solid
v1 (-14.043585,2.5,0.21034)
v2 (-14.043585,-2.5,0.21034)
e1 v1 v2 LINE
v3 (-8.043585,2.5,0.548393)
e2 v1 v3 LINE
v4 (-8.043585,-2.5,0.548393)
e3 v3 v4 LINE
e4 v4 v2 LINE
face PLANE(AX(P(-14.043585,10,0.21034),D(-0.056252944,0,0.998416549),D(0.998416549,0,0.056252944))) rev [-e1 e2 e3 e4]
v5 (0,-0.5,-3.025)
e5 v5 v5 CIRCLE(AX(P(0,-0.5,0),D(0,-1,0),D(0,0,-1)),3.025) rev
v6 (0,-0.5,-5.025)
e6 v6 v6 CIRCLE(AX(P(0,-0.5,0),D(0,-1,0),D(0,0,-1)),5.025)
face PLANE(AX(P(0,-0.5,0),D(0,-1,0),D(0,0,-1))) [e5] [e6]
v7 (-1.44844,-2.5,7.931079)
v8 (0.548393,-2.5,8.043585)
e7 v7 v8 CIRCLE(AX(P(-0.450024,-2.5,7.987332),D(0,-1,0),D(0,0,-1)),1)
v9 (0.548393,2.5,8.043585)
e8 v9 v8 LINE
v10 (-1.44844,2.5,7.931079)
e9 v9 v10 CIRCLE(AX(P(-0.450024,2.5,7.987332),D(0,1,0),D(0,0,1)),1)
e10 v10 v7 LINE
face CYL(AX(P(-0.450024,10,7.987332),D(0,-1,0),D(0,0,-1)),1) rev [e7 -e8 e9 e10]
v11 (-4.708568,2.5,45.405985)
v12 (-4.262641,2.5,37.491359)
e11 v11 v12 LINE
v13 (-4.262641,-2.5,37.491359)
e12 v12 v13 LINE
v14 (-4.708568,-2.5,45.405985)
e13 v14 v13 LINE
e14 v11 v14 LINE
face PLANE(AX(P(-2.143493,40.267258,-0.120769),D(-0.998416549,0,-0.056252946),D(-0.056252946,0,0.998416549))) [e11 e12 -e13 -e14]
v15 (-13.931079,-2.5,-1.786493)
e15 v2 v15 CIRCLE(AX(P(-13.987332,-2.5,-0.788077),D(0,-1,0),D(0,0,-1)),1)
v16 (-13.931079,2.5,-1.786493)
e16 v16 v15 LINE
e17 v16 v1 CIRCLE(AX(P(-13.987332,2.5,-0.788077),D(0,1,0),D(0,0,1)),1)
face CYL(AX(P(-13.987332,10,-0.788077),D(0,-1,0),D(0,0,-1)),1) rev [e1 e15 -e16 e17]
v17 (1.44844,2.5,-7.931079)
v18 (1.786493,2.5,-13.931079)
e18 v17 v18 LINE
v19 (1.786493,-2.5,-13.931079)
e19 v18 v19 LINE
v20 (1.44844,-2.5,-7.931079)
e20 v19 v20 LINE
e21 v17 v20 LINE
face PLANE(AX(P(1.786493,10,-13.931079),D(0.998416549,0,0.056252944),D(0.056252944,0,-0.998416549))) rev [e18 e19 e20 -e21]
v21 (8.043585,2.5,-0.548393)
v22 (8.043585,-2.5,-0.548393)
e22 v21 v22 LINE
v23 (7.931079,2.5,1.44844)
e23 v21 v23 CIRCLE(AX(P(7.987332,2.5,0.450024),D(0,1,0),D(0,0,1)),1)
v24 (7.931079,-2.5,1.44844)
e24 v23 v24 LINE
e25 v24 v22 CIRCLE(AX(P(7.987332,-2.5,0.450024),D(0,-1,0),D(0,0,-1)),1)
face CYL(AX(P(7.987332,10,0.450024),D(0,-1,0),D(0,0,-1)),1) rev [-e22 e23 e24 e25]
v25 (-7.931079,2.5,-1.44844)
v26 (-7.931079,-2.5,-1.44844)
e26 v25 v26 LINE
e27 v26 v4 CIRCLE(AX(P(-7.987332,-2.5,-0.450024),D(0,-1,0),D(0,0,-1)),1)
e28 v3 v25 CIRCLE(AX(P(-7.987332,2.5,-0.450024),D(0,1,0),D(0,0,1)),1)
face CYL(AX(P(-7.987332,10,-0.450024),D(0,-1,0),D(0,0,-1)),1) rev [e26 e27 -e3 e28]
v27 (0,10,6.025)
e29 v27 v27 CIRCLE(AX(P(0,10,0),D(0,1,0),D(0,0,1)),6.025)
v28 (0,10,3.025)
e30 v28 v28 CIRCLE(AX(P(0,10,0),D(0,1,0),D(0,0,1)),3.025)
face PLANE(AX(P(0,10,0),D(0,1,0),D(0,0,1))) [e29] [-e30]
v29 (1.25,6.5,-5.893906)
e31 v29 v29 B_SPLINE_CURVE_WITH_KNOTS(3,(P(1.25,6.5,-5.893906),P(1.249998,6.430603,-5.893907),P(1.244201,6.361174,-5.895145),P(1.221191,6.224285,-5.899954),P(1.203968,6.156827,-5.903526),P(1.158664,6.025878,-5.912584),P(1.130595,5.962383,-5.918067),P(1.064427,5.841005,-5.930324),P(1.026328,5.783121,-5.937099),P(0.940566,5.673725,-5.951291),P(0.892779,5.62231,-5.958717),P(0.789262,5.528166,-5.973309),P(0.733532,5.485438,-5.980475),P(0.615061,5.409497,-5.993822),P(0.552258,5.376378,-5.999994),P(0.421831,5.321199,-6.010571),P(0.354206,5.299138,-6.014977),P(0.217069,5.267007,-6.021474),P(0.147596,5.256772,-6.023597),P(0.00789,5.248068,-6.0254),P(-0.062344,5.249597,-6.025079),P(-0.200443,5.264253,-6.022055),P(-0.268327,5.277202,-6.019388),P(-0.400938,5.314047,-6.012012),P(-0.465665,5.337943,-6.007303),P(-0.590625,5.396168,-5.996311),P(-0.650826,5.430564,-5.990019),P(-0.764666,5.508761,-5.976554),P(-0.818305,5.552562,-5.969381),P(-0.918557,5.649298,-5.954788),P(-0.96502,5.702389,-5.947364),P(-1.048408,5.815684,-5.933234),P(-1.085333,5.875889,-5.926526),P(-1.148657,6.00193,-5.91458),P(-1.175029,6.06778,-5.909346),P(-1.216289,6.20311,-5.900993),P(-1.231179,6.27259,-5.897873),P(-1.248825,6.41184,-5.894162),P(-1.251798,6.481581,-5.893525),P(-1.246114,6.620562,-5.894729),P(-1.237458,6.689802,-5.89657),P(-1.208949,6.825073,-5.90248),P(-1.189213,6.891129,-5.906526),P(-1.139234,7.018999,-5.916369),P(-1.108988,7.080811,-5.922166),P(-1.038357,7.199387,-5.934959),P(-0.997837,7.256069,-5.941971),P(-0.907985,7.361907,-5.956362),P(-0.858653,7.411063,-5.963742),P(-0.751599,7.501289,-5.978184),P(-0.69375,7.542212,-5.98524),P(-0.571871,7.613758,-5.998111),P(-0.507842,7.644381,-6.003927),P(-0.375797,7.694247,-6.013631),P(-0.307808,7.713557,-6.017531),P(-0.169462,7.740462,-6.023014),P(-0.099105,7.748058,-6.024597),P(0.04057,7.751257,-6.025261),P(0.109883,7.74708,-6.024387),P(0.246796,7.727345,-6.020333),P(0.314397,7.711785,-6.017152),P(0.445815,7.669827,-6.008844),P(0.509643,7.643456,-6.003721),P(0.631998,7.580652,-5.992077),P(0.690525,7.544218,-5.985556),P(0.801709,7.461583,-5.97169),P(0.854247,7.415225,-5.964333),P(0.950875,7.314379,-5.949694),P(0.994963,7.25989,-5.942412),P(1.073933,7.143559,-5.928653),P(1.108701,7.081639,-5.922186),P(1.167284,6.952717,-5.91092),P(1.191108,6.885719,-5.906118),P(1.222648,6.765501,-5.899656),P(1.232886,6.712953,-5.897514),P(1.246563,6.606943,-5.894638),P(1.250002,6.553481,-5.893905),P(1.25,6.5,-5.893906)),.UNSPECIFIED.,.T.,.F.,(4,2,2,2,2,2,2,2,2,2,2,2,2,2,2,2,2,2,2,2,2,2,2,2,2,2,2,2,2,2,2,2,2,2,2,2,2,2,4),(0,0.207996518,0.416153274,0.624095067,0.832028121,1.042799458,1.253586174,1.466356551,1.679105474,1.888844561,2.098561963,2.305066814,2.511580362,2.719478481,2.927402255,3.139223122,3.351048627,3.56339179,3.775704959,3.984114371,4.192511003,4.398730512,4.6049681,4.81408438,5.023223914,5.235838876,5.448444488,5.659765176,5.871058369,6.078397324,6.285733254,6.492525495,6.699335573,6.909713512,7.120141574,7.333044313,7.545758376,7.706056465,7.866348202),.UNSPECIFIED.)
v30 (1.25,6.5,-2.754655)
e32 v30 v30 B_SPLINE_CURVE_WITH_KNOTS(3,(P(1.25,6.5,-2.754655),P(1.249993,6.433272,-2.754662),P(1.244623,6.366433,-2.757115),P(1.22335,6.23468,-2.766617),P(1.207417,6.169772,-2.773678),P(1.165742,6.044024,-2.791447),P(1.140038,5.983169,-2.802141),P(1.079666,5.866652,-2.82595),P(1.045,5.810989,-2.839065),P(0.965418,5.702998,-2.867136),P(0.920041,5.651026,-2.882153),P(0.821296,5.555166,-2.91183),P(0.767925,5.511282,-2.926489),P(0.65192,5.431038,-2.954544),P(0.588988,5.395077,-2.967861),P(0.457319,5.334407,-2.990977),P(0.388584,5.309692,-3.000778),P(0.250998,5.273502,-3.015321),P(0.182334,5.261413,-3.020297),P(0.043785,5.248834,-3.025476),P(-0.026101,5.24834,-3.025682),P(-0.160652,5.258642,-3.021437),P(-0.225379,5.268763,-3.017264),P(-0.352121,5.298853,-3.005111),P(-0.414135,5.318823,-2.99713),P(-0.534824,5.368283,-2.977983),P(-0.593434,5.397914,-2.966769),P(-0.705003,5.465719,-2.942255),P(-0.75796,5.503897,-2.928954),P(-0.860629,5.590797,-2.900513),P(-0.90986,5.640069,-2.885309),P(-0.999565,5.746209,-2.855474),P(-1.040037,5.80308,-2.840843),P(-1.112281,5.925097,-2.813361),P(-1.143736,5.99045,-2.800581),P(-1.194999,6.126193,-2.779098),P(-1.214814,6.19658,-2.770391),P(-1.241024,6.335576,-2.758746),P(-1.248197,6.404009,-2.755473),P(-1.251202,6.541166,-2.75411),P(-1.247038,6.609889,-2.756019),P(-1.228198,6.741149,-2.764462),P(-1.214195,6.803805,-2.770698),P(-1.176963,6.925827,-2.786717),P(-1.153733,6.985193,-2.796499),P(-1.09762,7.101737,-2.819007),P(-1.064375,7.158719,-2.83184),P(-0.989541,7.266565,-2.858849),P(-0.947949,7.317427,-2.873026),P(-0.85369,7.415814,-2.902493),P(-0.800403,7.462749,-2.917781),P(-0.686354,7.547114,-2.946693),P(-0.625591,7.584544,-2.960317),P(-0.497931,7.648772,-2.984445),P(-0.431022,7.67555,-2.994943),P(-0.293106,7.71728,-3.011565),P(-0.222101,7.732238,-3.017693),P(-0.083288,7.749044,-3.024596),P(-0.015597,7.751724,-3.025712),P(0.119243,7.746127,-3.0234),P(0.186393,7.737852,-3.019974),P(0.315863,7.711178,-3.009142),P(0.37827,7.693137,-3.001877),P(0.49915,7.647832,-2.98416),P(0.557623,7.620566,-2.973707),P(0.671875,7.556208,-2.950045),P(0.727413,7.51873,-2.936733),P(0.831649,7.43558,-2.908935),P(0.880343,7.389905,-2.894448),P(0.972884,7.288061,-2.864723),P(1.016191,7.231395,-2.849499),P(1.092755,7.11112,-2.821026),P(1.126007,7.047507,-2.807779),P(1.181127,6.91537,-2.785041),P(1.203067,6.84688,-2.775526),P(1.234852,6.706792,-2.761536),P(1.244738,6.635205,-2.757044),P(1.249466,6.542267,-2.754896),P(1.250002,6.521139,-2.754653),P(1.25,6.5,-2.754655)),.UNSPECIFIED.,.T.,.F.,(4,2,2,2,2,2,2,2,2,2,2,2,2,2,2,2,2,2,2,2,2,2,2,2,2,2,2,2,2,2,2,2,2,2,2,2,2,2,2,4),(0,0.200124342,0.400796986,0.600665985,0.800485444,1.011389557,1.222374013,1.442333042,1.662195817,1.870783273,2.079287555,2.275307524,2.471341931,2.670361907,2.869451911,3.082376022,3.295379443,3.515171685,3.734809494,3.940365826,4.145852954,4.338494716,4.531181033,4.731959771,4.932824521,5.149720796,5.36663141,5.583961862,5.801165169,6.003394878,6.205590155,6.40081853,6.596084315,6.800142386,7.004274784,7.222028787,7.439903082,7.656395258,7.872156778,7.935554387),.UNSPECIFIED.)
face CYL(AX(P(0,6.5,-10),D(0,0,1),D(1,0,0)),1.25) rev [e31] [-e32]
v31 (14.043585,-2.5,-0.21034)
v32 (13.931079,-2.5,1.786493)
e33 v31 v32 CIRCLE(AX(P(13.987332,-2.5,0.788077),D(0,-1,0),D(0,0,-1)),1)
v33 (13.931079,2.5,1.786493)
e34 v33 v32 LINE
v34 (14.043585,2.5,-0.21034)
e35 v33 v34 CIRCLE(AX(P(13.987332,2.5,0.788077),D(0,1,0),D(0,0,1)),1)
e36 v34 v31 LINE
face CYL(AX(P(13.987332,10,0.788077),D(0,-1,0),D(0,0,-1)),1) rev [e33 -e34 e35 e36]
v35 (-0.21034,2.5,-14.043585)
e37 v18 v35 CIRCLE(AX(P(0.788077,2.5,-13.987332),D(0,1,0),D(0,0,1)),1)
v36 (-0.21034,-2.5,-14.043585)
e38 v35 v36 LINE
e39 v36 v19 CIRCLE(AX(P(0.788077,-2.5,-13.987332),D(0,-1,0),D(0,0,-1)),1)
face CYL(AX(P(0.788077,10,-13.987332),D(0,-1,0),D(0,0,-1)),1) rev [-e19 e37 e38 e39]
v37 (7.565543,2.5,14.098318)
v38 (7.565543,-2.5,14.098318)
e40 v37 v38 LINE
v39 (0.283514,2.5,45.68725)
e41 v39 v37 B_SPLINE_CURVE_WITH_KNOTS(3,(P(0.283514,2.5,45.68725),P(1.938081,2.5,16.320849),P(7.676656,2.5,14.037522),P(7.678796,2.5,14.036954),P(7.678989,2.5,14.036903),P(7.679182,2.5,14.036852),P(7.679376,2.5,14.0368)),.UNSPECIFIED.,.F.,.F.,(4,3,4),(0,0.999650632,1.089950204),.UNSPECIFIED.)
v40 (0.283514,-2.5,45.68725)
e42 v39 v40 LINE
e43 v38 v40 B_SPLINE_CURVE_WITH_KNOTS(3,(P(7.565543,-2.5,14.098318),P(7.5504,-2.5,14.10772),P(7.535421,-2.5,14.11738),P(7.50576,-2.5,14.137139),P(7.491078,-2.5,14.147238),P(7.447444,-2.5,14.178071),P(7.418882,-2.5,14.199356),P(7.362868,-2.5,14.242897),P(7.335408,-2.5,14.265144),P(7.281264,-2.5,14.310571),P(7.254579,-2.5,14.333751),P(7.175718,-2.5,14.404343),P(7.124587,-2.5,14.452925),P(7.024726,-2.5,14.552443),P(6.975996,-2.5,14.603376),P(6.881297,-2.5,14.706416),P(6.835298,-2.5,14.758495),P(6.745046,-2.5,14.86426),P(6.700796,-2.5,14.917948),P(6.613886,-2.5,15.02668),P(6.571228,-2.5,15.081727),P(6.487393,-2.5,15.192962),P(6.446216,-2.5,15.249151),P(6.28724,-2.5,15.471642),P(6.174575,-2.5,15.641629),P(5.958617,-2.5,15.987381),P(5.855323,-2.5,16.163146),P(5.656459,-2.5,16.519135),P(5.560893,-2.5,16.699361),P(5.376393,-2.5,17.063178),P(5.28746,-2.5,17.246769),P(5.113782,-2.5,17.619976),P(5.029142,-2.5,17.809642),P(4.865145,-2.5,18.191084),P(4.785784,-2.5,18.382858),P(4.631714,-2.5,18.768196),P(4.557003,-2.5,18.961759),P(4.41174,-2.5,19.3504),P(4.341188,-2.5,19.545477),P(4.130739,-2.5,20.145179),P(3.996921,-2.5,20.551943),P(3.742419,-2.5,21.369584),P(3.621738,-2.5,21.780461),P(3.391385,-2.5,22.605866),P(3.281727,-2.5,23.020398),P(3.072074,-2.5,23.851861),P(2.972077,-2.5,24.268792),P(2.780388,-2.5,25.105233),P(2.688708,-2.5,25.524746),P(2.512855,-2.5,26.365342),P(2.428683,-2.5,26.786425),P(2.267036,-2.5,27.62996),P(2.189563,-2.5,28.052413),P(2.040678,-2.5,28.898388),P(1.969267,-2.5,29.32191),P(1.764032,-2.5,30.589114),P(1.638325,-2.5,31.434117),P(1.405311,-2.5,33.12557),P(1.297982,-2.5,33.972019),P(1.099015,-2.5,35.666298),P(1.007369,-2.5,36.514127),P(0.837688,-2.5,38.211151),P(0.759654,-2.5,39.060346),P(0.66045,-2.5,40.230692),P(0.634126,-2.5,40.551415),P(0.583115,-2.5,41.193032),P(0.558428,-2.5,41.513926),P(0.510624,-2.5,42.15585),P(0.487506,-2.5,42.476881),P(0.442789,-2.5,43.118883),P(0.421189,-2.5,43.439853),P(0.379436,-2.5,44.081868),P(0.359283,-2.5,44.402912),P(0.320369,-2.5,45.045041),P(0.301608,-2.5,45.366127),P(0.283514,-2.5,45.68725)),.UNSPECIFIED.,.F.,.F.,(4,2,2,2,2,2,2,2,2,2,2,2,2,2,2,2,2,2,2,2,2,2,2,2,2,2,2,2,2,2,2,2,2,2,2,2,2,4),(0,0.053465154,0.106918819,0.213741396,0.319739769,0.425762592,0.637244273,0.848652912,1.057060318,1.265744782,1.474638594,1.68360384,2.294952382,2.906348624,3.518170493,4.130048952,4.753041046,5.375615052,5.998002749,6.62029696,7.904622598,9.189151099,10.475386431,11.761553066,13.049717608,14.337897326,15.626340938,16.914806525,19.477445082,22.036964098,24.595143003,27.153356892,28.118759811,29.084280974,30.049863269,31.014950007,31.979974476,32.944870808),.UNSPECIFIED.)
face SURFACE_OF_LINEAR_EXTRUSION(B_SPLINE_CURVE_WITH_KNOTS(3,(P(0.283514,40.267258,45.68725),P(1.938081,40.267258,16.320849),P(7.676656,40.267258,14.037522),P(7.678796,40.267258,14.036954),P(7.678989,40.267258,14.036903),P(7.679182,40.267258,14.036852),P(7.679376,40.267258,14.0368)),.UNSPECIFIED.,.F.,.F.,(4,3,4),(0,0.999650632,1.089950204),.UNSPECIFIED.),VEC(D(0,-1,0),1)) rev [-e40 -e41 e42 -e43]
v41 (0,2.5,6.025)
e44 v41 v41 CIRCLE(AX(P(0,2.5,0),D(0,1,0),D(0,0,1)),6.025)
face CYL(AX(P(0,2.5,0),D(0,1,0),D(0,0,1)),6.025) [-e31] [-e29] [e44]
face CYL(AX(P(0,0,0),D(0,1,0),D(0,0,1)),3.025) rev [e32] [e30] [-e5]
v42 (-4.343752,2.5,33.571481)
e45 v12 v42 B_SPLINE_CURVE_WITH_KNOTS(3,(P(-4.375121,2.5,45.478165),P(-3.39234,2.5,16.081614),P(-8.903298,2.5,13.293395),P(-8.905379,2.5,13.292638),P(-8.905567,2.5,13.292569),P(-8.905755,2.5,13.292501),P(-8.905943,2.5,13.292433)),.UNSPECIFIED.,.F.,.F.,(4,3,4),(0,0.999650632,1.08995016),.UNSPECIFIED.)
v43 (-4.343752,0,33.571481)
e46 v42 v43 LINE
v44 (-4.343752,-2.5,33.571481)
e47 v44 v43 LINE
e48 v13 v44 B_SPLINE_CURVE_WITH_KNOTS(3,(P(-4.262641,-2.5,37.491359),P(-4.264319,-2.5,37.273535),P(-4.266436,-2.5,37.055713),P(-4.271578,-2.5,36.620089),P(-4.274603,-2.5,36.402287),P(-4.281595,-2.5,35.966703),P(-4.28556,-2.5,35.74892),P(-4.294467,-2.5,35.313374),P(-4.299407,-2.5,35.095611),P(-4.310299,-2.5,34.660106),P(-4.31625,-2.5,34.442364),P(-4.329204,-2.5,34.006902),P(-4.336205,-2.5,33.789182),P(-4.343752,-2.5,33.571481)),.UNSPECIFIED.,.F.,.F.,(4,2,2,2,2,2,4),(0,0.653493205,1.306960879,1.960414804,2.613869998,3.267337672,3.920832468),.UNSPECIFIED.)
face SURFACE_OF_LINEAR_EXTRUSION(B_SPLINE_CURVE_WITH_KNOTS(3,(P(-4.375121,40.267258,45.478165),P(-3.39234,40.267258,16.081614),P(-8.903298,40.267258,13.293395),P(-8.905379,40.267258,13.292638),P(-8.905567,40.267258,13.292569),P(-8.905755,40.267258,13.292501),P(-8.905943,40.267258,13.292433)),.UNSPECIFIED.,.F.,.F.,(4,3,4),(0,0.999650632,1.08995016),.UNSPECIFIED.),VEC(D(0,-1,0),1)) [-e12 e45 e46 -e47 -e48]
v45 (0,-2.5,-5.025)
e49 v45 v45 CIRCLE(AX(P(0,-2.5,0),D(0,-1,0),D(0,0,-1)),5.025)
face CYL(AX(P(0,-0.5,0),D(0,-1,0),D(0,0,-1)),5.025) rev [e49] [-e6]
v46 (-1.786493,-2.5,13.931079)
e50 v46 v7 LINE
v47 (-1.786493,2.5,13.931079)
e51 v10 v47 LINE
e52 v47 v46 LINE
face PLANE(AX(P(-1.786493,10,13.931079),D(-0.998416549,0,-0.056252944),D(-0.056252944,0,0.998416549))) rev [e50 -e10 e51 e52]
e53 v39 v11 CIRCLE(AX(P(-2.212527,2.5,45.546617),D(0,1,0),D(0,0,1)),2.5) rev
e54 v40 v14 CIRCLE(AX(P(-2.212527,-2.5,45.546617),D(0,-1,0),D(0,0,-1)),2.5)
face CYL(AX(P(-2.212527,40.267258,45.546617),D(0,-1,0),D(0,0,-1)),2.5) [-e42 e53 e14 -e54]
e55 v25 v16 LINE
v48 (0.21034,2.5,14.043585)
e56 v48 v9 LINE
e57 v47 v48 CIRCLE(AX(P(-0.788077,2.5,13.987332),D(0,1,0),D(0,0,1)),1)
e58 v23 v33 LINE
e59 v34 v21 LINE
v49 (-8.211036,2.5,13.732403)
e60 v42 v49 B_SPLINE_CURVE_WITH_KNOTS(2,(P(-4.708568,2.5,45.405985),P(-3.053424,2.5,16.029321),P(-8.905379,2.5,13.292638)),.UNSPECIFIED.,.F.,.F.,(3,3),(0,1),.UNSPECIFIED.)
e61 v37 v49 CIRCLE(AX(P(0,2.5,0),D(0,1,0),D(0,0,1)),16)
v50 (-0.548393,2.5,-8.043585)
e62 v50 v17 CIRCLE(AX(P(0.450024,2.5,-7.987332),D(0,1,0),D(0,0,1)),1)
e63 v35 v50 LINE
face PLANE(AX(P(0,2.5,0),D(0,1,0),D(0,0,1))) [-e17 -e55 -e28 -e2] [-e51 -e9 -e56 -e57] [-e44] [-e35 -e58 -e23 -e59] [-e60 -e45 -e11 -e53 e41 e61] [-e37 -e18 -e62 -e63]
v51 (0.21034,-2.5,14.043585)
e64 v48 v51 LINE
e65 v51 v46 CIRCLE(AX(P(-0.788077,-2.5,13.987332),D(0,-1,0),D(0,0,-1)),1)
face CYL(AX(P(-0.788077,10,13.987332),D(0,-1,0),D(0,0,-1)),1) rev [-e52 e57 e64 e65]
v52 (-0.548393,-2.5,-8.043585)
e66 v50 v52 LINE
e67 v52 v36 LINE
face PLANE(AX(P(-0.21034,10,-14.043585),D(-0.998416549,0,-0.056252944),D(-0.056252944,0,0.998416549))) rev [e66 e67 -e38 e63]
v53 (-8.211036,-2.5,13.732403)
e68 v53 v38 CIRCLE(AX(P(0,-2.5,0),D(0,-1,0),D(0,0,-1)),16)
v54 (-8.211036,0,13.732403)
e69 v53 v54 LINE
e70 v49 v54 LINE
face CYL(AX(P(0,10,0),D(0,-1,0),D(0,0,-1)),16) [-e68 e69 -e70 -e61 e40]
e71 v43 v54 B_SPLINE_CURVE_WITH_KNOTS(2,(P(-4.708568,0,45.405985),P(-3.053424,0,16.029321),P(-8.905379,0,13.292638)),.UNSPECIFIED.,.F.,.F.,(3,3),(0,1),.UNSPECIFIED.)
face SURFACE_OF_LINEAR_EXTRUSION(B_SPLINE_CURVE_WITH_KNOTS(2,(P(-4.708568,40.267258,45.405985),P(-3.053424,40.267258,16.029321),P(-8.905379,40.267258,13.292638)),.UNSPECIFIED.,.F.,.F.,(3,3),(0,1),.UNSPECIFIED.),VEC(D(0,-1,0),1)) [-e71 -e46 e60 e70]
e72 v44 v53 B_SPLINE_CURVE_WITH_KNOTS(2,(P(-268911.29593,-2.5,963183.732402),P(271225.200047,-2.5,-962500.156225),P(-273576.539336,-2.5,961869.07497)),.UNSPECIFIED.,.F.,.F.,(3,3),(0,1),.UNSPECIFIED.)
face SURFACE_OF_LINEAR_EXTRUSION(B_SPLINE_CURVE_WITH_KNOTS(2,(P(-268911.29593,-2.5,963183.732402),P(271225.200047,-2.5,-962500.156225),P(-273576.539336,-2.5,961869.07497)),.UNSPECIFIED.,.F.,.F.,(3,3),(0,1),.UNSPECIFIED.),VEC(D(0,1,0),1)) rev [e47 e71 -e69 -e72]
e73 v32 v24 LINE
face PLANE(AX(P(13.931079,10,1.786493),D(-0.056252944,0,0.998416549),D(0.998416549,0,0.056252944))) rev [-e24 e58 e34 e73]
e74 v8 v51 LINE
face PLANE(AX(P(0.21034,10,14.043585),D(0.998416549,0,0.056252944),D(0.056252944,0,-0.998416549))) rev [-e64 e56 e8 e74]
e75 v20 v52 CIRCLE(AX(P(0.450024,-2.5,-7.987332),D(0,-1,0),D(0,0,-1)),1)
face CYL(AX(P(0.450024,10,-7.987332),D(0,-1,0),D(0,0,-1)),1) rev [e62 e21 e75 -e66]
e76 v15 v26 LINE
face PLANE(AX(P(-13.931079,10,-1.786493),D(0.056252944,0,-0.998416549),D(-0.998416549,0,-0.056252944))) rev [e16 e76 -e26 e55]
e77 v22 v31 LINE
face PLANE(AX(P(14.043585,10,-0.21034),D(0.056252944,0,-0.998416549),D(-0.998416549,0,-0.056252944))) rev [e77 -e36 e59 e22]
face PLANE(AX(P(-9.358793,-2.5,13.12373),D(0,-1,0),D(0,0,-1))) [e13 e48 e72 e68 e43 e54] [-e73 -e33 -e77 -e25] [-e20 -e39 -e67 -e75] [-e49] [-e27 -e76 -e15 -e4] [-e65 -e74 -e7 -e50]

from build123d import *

# Parameters (mm, degrees)
BOSS_EXTRUDE1_OUTLINE_R = 16
BOSS_EXTRUDE1_DEPTH     = 10
SKETCH2_R               = 3.025
CUT_EXTRUDE1_DEPTH      = 25.738633754
CUT_EXTRUDE2_START      = -7.5
SKETCH3_R               = 16
SKETCH3_R_2             = 6.025
CUT_EXTRUDE2_DEPTH      = 7.5
SKETCH4_R               = 1.25
CUT_EXTRUDE3_DEPTH      = 10
CUT_EXTRUDE4_DEPTH      = 10
BOSS_EXTRUDE2_START     = -2.5
BOSS_EXTRUDE2_DEPTH     = 2.5
BOSS_EXTRUDE3_START     = 2.5
SKETCH9_R               = 3.025
BOSS_EXTRUDE3_DEPTH     = 2.5
SKETCH10_R              = 5.025
CUT_EXTRUDE5_DEPTH      = 2


# Read off the part's stored shape, not the designer's step: Boss-Extrude1, Boss-Extrude2
with BuildPart() as part:
    # Boss-Extrude1 outline → Boss-Extrude1 (new body)
    with BuildSketch(Plane(origin=(0, 0, 0), x_dir=(1, 0, 0), z_dir=(0, 1, 0))):
        Circle(BOSS_EXTRUDE1_OUTLINE_R)
    extrude(amount=BOSS_EXTRUDE1_DEPTH)

    # Sketch2 → Cut-Extrude1 (cut, through all)
    with BuildSketch(Plane(origin=(0, 10, 0), x_dir=(1, 0, 0), z_dir=(0, 1, 0))):
        with Locations(Location((0, 0, 0), (0, 0, 270))):
            Circle(SKETCH2_R)
    extrude(amount=-CUT_EXTRUDE1_DEPTH, mode=Mode.SUBTRACT)

    # Sketch3 → Cut-Extrude2 (cut)
    with BuildSketch(Plane(origin=(0, 10, 0), x_dir=(1, 0, 0), z_dir=(0, 1, 0)).offset(CUT_EXTRUDE2_START)):
        with Locations(Location((0, 0, 0), (0, 0, 270))):
            Circle(SKETCH3_R)
        with Locations(Location((0, 0, 0), (0, 0, 270))):
            Circle(SKETCH3_R_2, mode=Mode.SUBTRACT)
    extrude(amount=CUT_EXTRUDE2_DEPTH, mode=Mode.SUBTRACT)

    # Sketch4 → Cut-Extrude3 (cut)
    with BuildSketch(Plane.XY):
        with Locations((0, 6.5)):
            Circle(SKETCH4_R)
    extrude(amount=-CUT_EXTRUDE3_DEPTH, mode=Mode.SUBTRACT)

    # Sketch5 → Cut-Extrude4 (cut)
    with BuildSketch(Plane(origin=(0, 0, 0), x_dir=(-1, 0, 0), z_dir=(0, -1, 0))):
        with BuildLine():
            Line((0.210340042, 14.04358534), (0.548392997, 8.04358534))
            ThreePointArc((0.548392997, 8.04358534), (-0.393770609, 6.988915846), (-1.448440102, 7.931079452))
            Line((-1.448440102, 7.931079452), (-1.786493057, 13.931079452))
            ThreePointArc((-1.786493057, 13.931079452), (-0.844329452, 14.985748945), (0.210340042, 14.04358534))
        make_face()
        with BuildLine():
            Line((13.931079452, 1.786493057), (7.931079452, 1.448440102))
            ThreePointArc((7.931079452, 1.448440102), (6.988915846, 0.393770609), (8.04358534, -0.548392997))
            Line((8.04358534, -0.548392997), (14.04358534, -0.210340042))
            ThreePointArc((14.04358534, -0.210340042), (14.985748945, 0.844329452), (13.931079452, 1.786493057))
        make_face()
        with BuildLine():
            Line((1.786493057, -13.931079452), (1.448440102, -7.931079452))
            ThreePointArc((1.448440102, -7.931079452), (0.393770609, -6.988915846), (-0.548392997, -8.04358534))
            Line((-0.548392997, -8.04358534), (-0.210340042, -14.04358534))
            ThreePointArc((-0.210340042, -14.04358534), (0.844329452, -14.985748945), (1.786493057, -13.931079452))
        make_face()
        with BuildLine():
            Line((-13.931079452, -1.786493057), (-7.931079452, -1.448440102))
            ThreePointArc((-7.931079452, -1.448440102), (-6.988915846, -0.393770609), (-8.04358534, 0.548392997))
            Line((-8.04358534, 0.548392997), (-14.04358534, 0.210340042))
            ThreePointArc((-14.04358534, 0.210340042), (-14.985748945, -0.844329452), (-13.931079452, -1.786493057))
        make_face()
    extrude(amount=-CUT_EXTRUDE4_DEPTH, mode=Mode.SUBTRACT)

    # Boss-Extrude2 outline → Boss-Extrude2 (add)
    with BuildSketch(Plane.XZ.offset(BOSS_EXTRUDE2_START)):
        with BuildLine():
            Line((-4.70856839, 45.405985014), (-4.262641267, 37.491359232))
            add(Edge.make_bspline(
                [(-4.262641267, 37.491359232), (-4.273296685, 36.107939283), (-4.30106716, 34.802769075), (-4.343751974, 33.571480974)],
                knots=[0.099174475, 0.099174475, 0.099174475, 0.099174475, 0.155965257, 0.155965257, 0.155965257, 0.155965257], degree=3))
            add(Edge.make_bspline(
                [(-4.343751974, 33.571480974), (-4.363830382, 16.861397245), (-8.211036006, 13.732402838)],
                knots=[0.224223151, 0.224223151, 0.224223151, 0.938226666, 0.938226666, 0.938226666], degree=2))
            ThreePointArc((-8.211036006, 13.732402838), (-0.370996908, 15.995698212), (7.565543006, 14.098317596))
            add(Edge.make_bspline(
                [(0.283514356, 45.687249745), (1.800888573, 18.755833196), (6.7530796, 14.602380887), (7.565543006, 14.098317596)],
                knots=[0, 0, 0, 0, 0.916762244, 0.916762244, 0.916762244, 0.916762244], degree=3))
            ThreePointArc((0.283514356, 45.687249745), (-2.353159383, 48.042658753), (-4.70856839, 45.405985014))
        make_face()
    extrude(amount=BOSS_EXTRUDE2_DEPTH)

    # Sketch9 → Boss-Extrude3 (add)
    with BuildSketch(Plane.XZ.offset(BOSS_EXTRUDE3_START)):
        with BuildLine():
            Line((-4.70856839, 45.405985014), (-4.262641267, 37.491359232))
            add(Edge.make_bspline(
                [(-4.262641267, 37.491359232), (-4.273296685, 36.107939283), (-4.30106716, 34.802769075), (-4.343751974, 33.571480974)],
                knots=[0.099174475, 0.099174475, 0.099174475, 0.099174475, 0.155965257, 0.155965257, 0.155965257, 0.155965257], degree=3))
            add(Edge.make_bspline(
                [(-4.343751974, 33.571480974), (-4.363830382, 16.861397245), (-8.211036006, 13.732402838)],
                knots=[0, 0, 0, 1, 1, 1], degree=2))
            ThreePointArc((-8.211036006, 13.732402838), (0.370996908, -15.995698212), (7.565543006, 14.098317596))
            add(Edge.make_bspline(
                [(7.565543006, 14.098317596), (6.7530796, 14.602380887), (1.800888573, 18.755833196), (0.283514356, 45.687249745)],
                knots=[0, 0, 0, 0, 0.916762244, 0.916762244, 0.916762244, 0.916762244], degree=3))
            ThreePointArc((0.283514356, 45.687249745), (-2.353159383, 48.042658753), (-4.70856839, 45.405985014))
        make_face()
        with Locations(Location((0, 0, 0), (0, 0, 90))):
            Circle(SKETCH9_R, mode=Mode.SUBTRACT)
        with BuildLine():
            Line((-1.786493057, 13.931079452), (-1.448440102, 7.931079452))
            ThreePointArc((-1.448440102, 7.931079452), (-0.393770609, 6.988915846), (0.548392997, 8.04358534))
            Line((0.548392997, 8.04358534), (0.210340042, 14.04358534))
            ThreePointArc((0.210340042, 14.04358534), (-0.844329452, 14.985748945), (-1.786493057, 13.931079452))
        make_face(mode=Mode.SUBTRACT)
        with BuildLine():
            Line((-13.931079452, -1.786493057), (-7.931079452, -1.448440102))
            ThreePointArc((-7.931079452, -1.448440102), (-6.988915846, -0.393770609), (-8.04358534, 0.548392997))
            Line((-8.04358534, 0.548392997), (-14.04358534, 0.210340042))
            ThreePointArc((-14.04358534, 0.210340042), (-14.985748945, -0.844329452), (-13.931079452, -1.786493057))
        make_face(mode=Mode.SUBTRACT)
        with BuildLine():
            Line((1.786493057, -13.931079452), (1.448440102, -7.931079452))
            ThreePointArc((1.448440102, -7.931079452), (0.393770609, -6.988915846), (-0.548392997, -8.04358534))
            Line((-0.548392997, -8.04358534), (-0.210340042, -14.04358534))
            ThreePointArc((-0.210340042, -14.04358534), (0.844329452, -14.985748945), (1.786493057, -13.931079452))
        make_face(mode=Mode.SUBTRACT)
        with BuildLine():
            Line((13.931079452, 1.786493057), (7.931079452, 1.448440102))
            ThreePointArc((7.931079452, 1.448440102), (6.988915846, 0.393770609), (8.04358534, -0.548392997))
            Line((8.04358534, -0.548392997), (14.04358534, -0.210340042))
            ThreePointArc((14.04358534, -0.210340042), (14.985748945, 0.844329452), (13.931079452, 1.786493057))
        make_face(mode=Mode.SUBTRACT)
    extrude(amount=-BOSS_EXTRUDE3_DEPTH)

    # Sketch10 → Cut-Extrude5 (cut)
    with BuildSketch(Plane.XZ.offset(2.5)):
        with Locations(Location((0, 0, 0), (0, 0, 270))):
            Circle(SKETCH10_R)
    extrude(amount=-CUT_EXTRUDE5_DEPTH, mode=Mode.SUBTRACT)


solid = part.part
